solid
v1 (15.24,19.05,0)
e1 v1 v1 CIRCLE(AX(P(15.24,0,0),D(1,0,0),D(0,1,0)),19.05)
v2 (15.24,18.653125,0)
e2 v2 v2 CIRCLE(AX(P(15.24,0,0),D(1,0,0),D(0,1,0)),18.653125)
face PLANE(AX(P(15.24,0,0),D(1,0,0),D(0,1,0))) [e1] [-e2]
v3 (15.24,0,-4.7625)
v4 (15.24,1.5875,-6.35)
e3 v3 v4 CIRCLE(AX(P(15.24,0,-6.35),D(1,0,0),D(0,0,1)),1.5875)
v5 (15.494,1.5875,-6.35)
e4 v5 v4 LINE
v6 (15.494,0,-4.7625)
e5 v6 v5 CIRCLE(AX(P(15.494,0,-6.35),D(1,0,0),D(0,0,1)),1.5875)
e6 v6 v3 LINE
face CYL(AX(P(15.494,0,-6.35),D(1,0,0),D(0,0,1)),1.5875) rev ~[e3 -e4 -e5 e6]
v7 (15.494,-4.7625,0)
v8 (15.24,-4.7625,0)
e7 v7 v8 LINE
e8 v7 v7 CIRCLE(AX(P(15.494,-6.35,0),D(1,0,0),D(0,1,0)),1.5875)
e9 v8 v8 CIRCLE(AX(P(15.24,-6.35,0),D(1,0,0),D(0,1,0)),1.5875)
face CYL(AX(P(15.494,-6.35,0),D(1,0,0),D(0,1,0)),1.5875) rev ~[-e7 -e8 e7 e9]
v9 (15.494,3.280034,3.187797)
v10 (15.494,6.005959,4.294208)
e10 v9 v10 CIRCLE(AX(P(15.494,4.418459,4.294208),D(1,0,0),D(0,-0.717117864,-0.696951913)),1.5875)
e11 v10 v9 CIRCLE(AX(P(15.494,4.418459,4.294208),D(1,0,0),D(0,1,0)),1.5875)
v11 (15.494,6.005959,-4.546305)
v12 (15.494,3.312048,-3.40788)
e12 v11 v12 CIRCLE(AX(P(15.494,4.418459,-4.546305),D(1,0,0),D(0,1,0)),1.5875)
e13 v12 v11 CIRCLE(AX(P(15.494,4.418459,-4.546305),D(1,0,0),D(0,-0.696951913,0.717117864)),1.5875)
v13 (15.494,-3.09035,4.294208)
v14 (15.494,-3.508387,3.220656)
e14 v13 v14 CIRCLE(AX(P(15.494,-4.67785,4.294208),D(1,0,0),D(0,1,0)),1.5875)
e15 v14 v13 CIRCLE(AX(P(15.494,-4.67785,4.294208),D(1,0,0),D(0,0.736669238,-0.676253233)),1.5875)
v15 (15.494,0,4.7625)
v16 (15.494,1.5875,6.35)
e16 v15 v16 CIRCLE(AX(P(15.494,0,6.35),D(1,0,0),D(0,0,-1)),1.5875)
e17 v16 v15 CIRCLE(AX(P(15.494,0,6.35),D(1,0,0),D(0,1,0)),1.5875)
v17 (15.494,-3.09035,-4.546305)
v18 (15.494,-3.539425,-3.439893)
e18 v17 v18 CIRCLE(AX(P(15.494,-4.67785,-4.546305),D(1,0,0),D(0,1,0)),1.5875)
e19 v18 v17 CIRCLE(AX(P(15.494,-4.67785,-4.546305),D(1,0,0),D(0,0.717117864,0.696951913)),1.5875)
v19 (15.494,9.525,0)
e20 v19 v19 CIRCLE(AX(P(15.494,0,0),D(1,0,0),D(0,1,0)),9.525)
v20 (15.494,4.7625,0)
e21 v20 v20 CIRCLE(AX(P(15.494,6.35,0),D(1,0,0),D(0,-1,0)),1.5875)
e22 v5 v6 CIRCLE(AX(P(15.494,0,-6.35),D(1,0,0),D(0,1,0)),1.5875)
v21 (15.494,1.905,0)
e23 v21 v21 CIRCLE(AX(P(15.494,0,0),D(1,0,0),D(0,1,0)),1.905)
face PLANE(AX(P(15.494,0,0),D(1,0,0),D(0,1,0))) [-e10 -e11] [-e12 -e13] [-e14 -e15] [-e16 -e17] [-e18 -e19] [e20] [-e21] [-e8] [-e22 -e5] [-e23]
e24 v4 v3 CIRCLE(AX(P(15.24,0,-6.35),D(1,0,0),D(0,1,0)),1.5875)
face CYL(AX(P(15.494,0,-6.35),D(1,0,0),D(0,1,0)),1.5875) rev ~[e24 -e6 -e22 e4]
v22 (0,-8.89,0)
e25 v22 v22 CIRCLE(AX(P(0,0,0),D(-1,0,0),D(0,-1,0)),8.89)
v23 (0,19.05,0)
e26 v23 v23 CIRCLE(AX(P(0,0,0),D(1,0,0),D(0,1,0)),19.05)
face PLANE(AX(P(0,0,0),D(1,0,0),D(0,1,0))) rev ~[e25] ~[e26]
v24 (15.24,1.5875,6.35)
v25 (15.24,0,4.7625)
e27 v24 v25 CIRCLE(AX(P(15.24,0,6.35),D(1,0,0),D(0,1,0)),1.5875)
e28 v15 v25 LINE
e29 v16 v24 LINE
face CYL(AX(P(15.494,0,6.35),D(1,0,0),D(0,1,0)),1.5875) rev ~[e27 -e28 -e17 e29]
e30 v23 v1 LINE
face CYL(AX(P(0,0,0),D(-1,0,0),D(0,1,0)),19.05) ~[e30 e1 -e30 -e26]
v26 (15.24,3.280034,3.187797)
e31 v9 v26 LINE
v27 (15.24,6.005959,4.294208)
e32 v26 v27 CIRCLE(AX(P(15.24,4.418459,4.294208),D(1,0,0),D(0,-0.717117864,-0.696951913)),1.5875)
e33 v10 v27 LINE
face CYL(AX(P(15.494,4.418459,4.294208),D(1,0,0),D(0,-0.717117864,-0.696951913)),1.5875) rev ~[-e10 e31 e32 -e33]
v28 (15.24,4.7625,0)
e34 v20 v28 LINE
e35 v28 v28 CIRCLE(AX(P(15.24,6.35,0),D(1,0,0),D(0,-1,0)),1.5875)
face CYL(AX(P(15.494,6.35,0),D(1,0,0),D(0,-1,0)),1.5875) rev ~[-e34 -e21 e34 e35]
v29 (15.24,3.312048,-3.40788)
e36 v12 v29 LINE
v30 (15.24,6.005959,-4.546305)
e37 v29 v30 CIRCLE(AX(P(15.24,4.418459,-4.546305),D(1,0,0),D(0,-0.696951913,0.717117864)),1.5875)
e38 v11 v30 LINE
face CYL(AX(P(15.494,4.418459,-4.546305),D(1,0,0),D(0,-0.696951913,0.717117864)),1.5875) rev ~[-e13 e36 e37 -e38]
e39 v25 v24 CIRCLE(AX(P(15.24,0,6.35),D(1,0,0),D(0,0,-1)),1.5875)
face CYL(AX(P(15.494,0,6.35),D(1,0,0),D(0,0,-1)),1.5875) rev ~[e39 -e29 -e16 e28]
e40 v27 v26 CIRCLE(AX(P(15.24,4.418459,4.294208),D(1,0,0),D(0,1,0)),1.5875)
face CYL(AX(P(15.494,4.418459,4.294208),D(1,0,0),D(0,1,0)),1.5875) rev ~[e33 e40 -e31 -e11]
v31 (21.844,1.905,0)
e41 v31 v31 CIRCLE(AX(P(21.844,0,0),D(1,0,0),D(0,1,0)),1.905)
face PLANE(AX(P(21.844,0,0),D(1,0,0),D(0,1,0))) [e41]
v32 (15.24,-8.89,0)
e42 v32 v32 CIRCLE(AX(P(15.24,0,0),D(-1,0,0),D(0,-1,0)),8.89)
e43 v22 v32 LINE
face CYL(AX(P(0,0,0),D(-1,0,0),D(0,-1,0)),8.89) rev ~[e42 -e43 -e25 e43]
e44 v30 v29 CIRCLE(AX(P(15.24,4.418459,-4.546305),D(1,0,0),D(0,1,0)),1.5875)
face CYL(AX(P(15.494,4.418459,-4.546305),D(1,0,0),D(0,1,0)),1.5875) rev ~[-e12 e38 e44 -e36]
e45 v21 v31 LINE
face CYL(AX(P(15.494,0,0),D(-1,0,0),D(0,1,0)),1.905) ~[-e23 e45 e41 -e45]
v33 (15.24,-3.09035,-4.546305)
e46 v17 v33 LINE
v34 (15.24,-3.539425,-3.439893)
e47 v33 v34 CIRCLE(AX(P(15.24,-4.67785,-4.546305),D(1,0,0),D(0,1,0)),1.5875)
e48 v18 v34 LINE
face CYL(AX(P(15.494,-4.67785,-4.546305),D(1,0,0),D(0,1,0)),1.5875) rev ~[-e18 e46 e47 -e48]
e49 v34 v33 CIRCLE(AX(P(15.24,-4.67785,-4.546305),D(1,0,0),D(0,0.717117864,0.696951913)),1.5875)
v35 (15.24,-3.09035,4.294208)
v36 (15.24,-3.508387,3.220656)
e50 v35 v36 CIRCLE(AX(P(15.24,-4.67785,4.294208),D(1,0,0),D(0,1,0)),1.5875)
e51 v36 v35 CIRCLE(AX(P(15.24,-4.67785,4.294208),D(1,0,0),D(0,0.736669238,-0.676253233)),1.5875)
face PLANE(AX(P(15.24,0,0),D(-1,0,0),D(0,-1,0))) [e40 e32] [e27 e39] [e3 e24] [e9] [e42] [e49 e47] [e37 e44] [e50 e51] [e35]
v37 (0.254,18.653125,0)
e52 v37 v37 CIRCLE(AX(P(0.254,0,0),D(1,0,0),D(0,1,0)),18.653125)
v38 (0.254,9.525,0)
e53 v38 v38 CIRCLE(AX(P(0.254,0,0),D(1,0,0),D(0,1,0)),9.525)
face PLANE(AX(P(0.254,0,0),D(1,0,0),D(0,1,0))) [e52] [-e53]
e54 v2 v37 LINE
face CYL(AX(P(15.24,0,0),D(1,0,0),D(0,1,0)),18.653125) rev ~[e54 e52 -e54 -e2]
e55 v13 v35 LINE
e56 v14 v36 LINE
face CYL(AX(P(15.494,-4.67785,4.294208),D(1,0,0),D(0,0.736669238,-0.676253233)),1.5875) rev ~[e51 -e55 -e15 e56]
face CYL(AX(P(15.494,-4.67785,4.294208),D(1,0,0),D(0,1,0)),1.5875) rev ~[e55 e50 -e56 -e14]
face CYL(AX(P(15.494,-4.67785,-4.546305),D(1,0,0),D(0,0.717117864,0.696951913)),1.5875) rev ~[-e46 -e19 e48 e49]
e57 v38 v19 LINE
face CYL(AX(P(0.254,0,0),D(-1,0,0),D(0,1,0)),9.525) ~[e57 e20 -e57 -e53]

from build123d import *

# Parameters (mm, degrees)
F0_R      = 19.05
F1_DEPTH  = 15.24
F2_R      = 18.653125
F3_DEPTH  = 14.986
F4_R      = 9.525
F5_DEPTH  = 15.24
F7_R      = 1.5875
F8_DEPTH  = 2.54
F9_R      = 8.89
F10_DEPTH = 15.24
F11_R     = 1.905
F12_DEPTH = 6.35


# Not quite as in the source:
# - a feature names something its author has since deleted; it is built from what else it names


with BuildPart() as f1:
    # F0 (on Right) → F1 (new body)
    with BuildSketch(Plane.YZ):
        Circle(F0_R)
    extrude(amount=F1_DEPTH)

    # F2 (on face) → F3 (cut)
    with BuildSketch(Plane.YZ.offset(15.24)):
        Circle(F2_R)
    extrude(amount=-F3_DEPTH, mode=Mode.SUBTRACT)

    # F4 (on face) → F5 (join)
    with BuildSketch(Plane.YZ.offset(0.254)):
        Circle(F4_R)
    extrude(amount=F5_DEPTH)

    # F7 (on face) → F8 (cut)
    with BuildSketch(Plane.YZ.offset(15.494)):
        with BuildLine():
            ThreePointArc((1.5875, 6.35), (-1.1225320151, 7.4725320151), (0, 4.7625))
            ThreePointArc((0, 4.7625), (1.1225320151, 5.2274679849), (1.5875, 6.35))
        make_face()
        with BuildLine():
            ThreePointArc((7.9375, 0), (6.35, 1.5875), (4.7625, 0))
            ThreePointArc((4.7625, 0), (6.35, -1.5875), (7.9375, 0))
        make_face()
        with BuildLine():
            ThreePointArc((1.5875, -6.35), (1.1225320151, -5.2274679849), (0, -4.7625))
            ThreePointArc((0, -4.7625), (-1.1225320151, -7.4725320151), (1.5875, -6.35))
        make_face()
        with Locations((-6.35, 0)):
            Circle(F7_R)
        with BuildLine():
            ThreePointArc((6.0059587639, 4.2942080269), (3.8214214188, 5.7651610032), (3.2800341547, 3.187796865))
            ThreePointArc((3.2800341547, 3.187796865), (5.015496109, 2.8232550506), (6.0059587639, 4.2942080269))
        make_face()
        with BuildLine():
            ThreePointArc((6.0059587639, -4.5463046331), (5.0364104329, -3.0840146534), (3.312047602, -3.4078800239))
            ThreePointArc((3.312047602, -3.4078800239), (3.8005070949, -6.0085946128), (6.0059587639, -4.5463046331))
        make_face()
        with BuildLine():
            ThreePointArc((-3.0903496579, -4.5463046331), (-3.2068966816, -3.949267288), (-3.5394250487, -3.4398934712))
            ThreePointArc((-3.5394250487, -3.4398934712), (-6.1488026342, -5.1433419782), (-3.0903496579, -4.5463046331))
        make_face()
        with BuildLine():
            ThreePointArc((-3.0903496579, 4.2942080269), (-6.157153182, 4.8702439055), (-3.5083872434, 3.2206560202))
            ThreePointArc((-3.5083872434, 3.2206560202), (-3.1985461338, 3.7181721482), (-3.0903496579, 4.2942080269))
        make_face()
    extrude(amount=-F8_DEPTH, mode=Mode.SUBTRACT)

    # F9 (on face) → F10 (cut)
    with BuildSketch(Plane(origin=(0, 0, 0), x_dir=(0, -1, 0), z_dir=(-1, 0, 0))):
        Circle(F9_R)
    extrude(amount=-F10_DEPTH, mode=Mode.SUBTRACT)

    # F11 (on face) → F12 (join)
    with BuildSketch(Plane.YZ.offset(15.494)):
        Circle(F11_R)
    extrude(amount=F12_DEPTH)


solid = f1.part
